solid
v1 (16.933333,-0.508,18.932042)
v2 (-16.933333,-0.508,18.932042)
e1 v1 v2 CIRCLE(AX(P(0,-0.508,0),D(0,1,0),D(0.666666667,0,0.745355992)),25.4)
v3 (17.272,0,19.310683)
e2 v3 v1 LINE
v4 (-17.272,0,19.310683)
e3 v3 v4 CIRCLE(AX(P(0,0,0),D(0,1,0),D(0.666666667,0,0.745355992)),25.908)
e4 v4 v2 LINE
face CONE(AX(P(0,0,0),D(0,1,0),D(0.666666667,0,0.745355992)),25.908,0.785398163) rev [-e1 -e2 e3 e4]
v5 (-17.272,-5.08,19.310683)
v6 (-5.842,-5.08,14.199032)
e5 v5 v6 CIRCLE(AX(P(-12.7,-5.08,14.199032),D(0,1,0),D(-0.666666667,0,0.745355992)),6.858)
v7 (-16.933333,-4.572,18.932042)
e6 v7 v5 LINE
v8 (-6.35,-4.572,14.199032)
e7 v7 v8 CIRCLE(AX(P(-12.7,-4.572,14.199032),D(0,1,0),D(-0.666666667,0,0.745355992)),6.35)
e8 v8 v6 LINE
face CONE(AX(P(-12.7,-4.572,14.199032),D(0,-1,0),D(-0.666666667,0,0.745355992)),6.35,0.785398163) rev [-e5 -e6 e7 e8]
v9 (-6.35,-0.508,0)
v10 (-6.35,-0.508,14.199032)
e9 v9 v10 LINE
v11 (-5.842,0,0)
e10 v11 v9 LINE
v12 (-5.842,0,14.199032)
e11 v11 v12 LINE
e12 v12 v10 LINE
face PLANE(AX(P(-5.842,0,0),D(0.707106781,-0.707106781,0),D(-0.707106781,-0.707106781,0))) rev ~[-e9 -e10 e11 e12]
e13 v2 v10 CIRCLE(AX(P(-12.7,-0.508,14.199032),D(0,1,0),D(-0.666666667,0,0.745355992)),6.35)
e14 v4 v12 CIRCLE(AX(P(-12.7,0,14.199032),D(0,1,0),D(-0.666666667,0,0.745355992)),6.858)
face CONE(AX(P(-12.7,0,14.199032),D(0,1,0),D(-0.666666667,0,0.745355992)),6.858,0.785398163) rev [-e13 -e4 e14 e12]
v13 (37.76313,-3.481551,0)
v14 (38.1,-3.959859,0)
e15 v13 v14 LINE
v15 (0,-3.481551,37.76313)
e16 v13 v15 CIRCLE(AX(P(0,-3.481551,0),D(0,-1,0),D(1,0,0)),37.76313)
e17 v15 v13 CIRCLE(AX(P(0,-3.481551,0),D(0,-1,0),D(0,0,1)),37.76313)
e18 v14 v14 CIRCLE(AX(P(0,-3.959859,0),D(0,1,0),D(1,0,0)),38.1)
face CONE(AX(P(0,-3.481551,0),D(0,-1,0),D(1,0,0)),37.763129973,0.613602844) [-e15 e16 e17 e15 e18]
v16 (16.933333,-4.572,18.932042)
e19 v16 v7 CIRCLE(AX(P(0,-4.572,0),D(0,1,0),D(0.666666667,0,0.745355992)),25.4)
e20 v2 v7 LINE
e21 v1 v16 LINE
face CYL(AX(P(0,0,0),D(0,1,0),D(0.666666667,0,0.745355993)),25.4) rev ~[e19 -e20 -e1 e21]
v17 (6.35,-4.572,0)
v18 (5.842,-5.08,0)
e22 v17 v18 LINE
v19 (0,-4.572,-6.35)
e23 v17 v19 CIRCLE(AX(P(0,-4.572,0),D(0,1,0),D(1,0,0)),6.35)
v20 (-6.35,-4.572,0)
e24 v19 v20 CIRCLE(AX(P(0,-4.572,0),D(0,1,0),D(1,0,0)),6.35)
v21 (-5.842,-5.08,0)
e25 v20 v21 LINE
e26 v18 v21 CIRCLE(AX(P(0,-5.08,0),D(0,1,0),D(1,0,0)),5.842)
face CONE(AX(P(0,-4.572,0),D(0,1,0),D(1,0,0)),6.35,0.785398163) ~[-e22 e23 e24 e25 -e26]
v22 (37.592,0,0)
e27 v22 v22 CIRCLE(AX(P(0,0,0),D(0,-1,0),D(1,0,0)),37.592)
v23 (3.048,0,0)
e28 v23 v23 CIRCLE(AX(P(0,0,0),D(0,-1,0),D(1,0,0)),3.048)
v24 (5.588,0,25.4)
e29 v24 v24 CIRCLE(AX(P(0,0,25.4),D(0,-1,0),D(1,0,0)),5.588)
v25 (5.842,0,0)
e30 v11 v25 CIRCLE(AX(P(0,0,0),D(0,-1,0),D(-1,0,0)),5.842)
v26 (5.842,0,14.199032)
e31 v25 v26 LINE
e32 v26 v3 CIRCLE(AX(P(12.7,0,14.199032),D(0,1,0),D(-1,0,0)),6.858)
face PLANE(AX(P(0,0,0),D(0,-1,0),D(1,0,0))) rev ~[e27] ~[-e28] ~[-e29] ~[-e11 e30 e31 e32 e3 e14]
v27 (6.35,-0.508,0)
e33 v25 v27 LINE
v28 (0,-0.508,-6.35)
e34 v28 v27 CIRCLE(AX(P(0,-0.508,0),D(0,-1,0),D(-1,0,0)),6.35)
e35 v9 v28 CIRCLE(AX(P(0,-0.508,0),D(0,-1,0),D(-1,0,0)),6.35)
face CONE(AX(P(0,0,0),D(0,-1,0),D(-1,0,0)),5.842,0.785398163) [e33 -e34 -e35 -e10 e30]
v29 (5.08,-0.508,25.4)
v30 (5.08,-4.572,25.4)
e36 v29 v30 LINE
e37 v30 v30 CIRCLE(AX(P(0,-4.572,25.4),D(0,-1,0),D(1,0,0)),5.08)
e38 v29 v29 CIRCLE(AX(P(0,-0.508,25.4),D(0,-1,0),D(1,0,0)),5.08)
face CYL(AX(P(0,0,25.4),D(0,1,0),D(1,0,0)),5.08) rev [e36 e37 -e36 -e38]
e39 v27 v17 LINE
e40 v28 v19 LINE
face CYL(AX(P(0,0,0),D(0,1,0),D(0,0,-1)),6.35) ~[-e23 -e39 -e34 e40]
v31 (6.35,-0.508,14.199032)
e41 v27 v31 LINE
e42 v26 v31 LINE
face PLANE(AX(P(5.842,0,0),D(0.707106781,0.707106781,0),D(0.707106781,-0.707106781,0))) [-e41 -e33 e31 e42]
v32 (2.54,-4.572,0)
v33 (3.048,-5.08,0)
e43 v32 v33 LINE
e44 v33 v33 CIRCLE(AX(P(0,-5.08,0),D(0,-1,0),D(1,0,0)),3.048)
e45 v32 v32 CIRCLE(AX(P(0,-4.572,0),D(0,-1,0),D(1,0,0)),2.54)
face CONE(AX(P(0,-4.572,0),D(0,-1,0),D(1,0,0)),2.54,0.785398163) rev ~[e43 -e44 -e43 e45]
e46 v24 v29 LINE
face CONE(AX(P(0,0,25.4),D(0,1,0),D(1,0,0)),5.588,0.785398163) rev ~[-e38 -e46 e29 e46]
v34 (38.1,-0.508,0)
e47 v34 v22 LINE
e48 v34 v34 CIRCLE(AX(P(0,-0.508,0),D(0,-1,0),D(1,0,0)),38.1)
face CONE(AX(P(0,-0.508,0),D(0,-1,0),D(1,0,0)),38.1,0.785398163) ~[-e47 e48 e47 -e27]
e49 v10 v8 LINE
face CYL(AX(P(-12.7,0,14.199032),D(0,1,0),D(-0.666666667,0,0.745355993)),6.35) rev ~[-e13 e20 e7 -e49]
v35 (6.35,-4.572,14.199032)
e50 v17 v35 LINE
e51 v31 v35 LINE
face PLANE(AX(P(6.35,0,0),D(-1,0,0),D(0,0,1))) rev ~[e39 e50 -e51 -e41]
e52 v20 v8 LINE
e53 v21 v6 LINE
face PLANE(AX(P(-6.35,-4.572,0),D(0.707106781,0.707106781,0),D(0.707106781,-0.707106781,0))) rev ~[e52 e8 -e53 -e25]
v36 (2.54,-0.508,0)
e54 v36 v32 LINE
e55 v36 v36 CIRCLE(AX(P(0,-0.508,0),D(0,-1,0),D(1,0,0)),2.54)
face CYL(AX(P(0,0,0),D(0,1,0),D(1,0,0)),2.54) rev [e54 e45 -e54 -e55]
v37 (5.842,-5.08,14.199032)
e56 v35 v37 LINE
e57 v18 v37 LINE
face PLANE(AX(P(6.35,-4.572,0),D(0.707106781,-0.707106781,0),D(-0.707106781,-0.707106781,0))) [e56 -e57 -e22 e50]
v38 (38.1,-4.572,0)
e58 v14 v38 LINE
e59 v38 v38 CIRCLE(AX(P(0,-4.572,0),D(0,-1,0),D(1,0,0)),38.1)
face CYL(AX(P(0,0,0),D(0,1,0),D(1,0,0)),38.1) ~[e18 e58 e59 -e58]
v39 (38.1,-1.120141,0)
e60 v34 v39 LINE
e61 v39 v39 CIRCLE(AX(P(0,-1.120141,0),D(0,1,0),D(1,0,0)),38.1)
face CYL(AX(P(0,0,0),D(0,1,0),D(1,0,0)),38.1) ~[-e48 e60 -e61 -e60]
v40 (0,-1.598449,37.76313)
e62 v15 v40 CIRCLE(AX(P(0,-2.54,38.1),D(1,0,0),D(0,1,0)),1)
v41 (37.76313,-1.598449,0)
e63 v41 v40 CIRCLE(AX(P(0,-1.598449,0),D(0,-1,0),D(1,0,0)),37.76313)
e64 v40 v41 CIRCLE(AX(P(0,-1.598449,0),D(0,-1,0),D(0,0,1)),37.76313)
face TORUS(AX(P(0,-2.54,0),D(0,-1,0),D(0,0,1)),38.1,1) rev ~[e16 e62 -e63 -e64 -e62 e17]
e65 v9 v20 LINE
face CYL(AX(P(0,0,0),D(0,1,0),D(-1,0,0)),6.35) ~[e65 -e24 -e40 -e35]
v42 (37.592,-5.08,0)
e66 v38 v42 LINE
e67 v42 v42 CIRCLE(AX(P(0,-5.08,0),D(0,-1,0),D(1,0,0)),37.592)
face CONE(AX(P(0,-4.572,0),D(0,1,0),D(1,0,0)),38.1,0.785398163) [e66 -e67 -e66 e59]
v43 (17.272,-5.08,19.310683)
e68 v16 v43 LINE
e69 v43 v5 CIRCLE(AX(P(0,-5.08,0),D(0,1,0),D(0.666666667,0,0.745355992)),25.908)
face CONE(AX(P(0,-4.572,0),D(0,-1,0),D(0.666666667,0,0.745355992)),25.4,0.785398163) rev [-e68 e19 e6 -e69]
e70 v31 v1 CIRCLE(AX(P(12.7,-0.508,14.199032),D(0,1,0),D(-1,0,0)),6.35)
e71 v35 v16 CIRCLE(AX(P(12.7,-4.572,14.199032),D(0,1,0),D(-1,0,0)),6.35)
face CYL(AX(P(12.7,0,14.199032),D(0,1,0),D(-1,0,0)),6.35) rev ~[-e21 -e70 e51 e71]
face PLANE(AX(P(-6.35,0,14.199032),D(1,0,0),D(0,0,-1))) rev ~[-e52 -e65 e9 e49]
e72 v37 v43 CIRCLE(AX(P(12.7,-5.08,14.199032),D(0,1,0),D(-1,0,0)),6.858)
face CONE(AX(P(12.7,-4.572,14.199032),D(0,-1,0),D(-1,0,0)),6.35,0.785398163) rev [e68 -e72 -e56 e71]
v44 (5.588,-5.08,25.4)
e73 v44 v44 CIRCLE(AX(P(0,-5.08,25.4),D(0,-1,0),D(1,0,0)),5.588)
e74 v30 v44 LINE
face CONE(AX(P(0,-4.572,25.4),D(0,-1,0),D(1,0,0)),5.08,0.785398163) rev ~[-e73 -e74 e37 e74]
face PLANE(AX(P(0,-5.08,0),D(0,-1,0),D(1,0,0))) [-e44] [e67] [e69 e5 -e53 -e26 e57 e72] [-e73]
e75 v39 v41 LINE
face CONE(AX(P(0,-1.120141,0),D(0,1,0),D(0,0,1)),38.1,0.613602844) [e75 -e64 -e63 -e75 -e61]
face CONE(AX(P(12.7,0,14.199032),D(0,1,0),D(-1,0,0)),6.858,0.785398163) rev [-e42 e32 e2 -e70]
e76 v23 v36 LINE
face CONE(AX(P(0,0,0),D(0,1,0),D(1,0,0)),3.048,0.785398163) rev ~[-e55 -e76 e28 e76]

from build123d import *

# Parameters (mm, degrees)
F0_R         = 38.1
F0_R_2       = 2.54
F0_R_3       = 5.08
F1_DEPTH     = 5.08
F5_T1_DEPTH  = 14.1990316571
F5_T6_ANGLE  = 276.3793702084
F5_T8_ANGLE  = 131.8103148958
F5_T10_ANGLE = 180
F5_T12_ANGLE = 131.8103148958
F5_T20_ANGLE = 276.3793702084
F5_T22_ANGLE = 131.8103148958
F5_T24_ANGLE = 180
F5_T26_ANGLE = 131.8103148958
F5_T32_ANGLE = 270
F5_T34_ANGLE = 90
F5_T36_ANGLE = 90
F5_T38_ANGLE = 270


# Not quite as in the source:
# - a fillet or chamfer that OpenCascade refuses, or shapes differently, is made with other operations: its cross-section is extruded or revolved along the edge and cut away or added


with BuildPart() as f1:
    # F0 (on Front) → F1 (new body)
    with BuildSketch(Plane.XZ):
        Circle(F0_R)
        with BuildLine():
            ThreePointArc((16.9333333333, 18.9320422095), (0, -25.4), (-16.9333333333, 18.9320422095))
            ThreePointArc((-16.9333333333, 18.9320422095), (-10.1076233556, 19.9957620574), (-6.35, 14.1990316571))
            Line((-6.35, 14.1990316571), (-6.35, 0))
            ThreePointArc((-6.35, 0), (-4.4901280605, -4.4901280605), (0, -6.35))
            ThreePointArc((0, -6.35), (4.4901280605, -4.4901280605), (6.35, 0))
            Line((6.35, 0), (6.35, 14.1990316571))
            ThreePointArc((6.35, 14.1990316571), (10.1076233556, 19.9957620574), (16.9333333333, 18.9320422095))
        make_face(mode=Mode.SUBTRACT)
        Circle(F0_R_2, mode=Mode.SUBTRACT)
        with Locations((0, 25.4)):
            Circle(F0_R_3, mode=Mode.SUBTRACT)
    extrude(amount=F1_DEPTH)


with BuildPart() as f3:
    # F2 (on Right) → F3 (revolve)
    with BuildSketch(Plane.YZ):
        with BuildLine():
            ThreePointArc((-3.54, 38.1), (-2.54, 37.1), (-1.54, 38.1))
            Line((-1.54, 38.1), (-3.54, 38.1))
        make_face()
        with BuildLine():
            Line((-3.54, 38.1), (-1.54, 38.1))
            ThreePointArc((-1.54, 38.1), (-2.54, 39.1), (-3.54, 38.1))
        make_face()
    revolve(axis=Axis((0, 0, 0), (0, -1, 0)))


with BuildPart() as f1_1:
    add(f1.part)

    # F4: cut F3
    add(f3.part, mode=Mode.SUBTRACT)

    # F5: chamfer of 0.508 on 22 edges, made by hand

    # F5_s2 → F5_t1 (cut)
    with BuildSketch(Plane.XY):
        Polygon((-6.35, -4.572), (-5.842, -5.08), (-6.35, -5.08), align=None)
        Polygon((6.35, -4.572), (5.842, -5.08), (6.35, -5.08), align=None)
        Polygon((-5.842, 0), (-6.35, -0.508), (-6.35, 0), align=None)
        Polygon((5.842, 0), (6.35, -0.508), (6.35, 0), align=None)
    extrude(amount=F5_T1_DEPTH, mode=Mode.SUBTRACT)

    # F5_s3 → F5_t4 (revolve, cut)
    with BuildSketch(Plane.XY):
        Polygon((38.1, -4.572), (37.592, -5.08), (38.1, -5.08), align=None)
    revolve(axis=Axis((0, -5.08, 0), (0, -1, 0)), mode=Mode.SUBTRACT)

    # F5_s5 → F5_t6 (revolve, cut)
    with BuildSketch(Plane(origin=(0, 0, 0), x_dir=(0, 1, 0), z_dir=(-0.7453559925, 0, 0.6666666667))):
        Polygon((-4.572, -25.4), (-5.08, -25.908), (-5.08, -25.4), align=None)
    revolve(axis=Axis((0, -5.08, 0), (0, 1, 0)), revolution_arc=F5_T6_ANGLE, mode=Mode.SUBTRACT)

    # F5_s7 → F5_t8 (revolve, cut)
    with BuildSketch(Plane(origin=(0, 0, 0), x_dir=(0, 1, 0), z_dir=(-0.7453559925, 0, -0.6666666667))):
        Polygon((-4.572, -25.4), (-5.08, -25.908), (-5.08, -25.4), align=None)
    revolve(axis=Axis((-12.7, -5.08, 14.1990316571), (0, 1, 0)), revolution_arc=F5_T8_ANGLE, mode=Mode.SUBTRACT)

    # F5_s9 → F5_t10 (revolve, cut)
    with BuildSketch(Plane.XY):
        Polygon((6.35, -4.572), (5.842, -5.08), (6.35, -5.08), align=None)
    revolve(axis=Axis((0, -5.08, 0), (0, 1, 0)), revolution_arc=F5_T10_ANGLE, mode=Mode.SUBTRACT)

    # F5_s11 → F5_t12 (revolve, cut)
    with BuildSketch(Plane.XY.offset(14.1990316571)):
        Polygon((6.35, -4.572), (5.842, -5.08), (6.35, -5.08), align=None)
    revolve(axis=Axis((12.7, -5.08, 14.1990316571), (0, 1, 0)), revolution_arc=F5_T12_ANGLE, mode=Mode.SUBTRACT)

    # F5_s13 → F5_t14 (revolve, cut)
    with BuildSketch(Plane.XY):
        Polygon((2.54, -4.572), (3.048, -5.08), (2.54, -5.08), align=None)
    revolve(axis=Axis((0, -5.08, 0), (0, -1, 0)), mode=Mode.SUBTRACT)

    # F5_s15 → F5_t16 (revolve, cut)
    with BuildSketch(Plane.XY.offset(25.4)):
        Polygon((5.08, -4.572), (5.588, -5.08), (5.08, -5.08), align=None)
    revolve(axis=Axis((0, -5.08, 25.4), (0, -1, 0)), mode=Mode.SUBTRACT)

    # F5_s17 → F5_t18 (revolve, cut)
    with BuildSketch(Plane.XY):
        Polygon((38.1, -0.508), (37.592, 0), (38.1, 0), align=None)
    revolve(axis=Axis((0, 0, 0), (0, -1, 0)), mode=Mode.SUBTRACT)

    # F5_s19 → F5_t20 (revolve, cut)
    with BuildSketch(Plane(origin=(0, 0, 0), x_dir=(0, 1, 0), z_dir=(-0.7453559925, 0, 0.6666666667))):
        Polygon((0, -25.908), (-0.508, -25.4), (0, -25.4), align=None)
    revolve(axis=Axis((0, 0, 0), (0, 1, 0)), revolution_arc=F5_T20_ANGLE, mode=Mode.SUBTRACT)

    # F5_s21 → F5_t22 (revolve, cut)
    with BuildSketch(Plane(origin=(0, 0, 0), x_dir=(0, 1, 0), z_dir=(-0.7453559925, 0, -0.6666666667))):
        Polygon((0, -25.908), (-0.508, -25.4), (0, -25.4), align=None)
    revolve(axis=Axis((-12.7, 0, 14.1990316571), (0, 1, 0)), revolution_arc=F5_T22_ANGLE, mode=Mode.SUBTRACT)

    # F5_s23 → F5_t24 (revolve, cut)
    with BuildSketch(Plane.XY):
        Polygon((-5.842, 0), (-6.35, -0.508), (-6.35, 0), align=None)
    revolve(axis=Axis((0, 0, 0), (0, -1, 0)), revolution_arc=F5_T24_ANGLE, mode=Mode.SUBTRACT)

    # F5_s25 → F5_t26 (revolve, cut)
    with BuildSketch(Plane.XY.offset(14.1990316571)):
        Polygon((5.842, 0), (6.35, -0.508), (6.35, 0), align=None)
    revolve(axis=Axis((12.7, 0, 14.1990316571), (0, 1, 0)), revolution_arc=F5_T26_ANGLE, mode=Mode.SUBTRACT)

    # F5_s27 → F5_t28 (revolve, cut)
    with BuildSketch(Plane.XY):
        Polygon((3.048, 0), (2.54, -0.508), (2.54, 0), align=None)
    revolve(axis=Axis((0, 0, 0), (0, -1, 0)), mode=Mode.SUBTRACT)

    # F5_s29 → F5_t30 (revolve, cut)
    with BuildSketch(Plane.XY.offset(25.4)):
        Polygon((5.588, 0), (5.08, -0.508), (5.08, 0), align=None)
    revolve(axis=Axis((0, 0, 25.4), (0, -1, 0)), mode=Mode.SUBTRACT)

    # F5_s31 → F5_t32 (revolve, cut)
    with BuildSketch(Plane.YZ):
        with BuildLine():
            Line((-1.1201408521, 38.1), (-1.5984488409, 37.7631299735))
            ThreePointArc((-1.5984488409, 37.7631299735), (-1.5560027564, 37.921816318), (-1.54, 38.1))
            Line((-1.54, 38.1), (-1.1201408521, 38.1))
        make_face()
    revolve(axis=Axis((0, -1.54, 0), (0, -1, 0)), revolution_arc=F5_T32_ANGLE, mode=Mode.SUBTRACT)

    # F5_s33 → F5_t34 (revolve, cut)
    with BuildSketch(Plane.XY):
        with BuildLine():
            Line((38.1, -1.1201408521), (37.7631299735, -1.5984488409))
            ThreePointArc((37.7631299735, -1.5984488409), (37.921816318, -1.5560027564), (38.1, -1.54))
            Line((38.1, -1.54), (38.1, -1.1201408521))
        make_face()
    revolve(axis=Axis((0, -1.54, 0), (0, -1, 0)), revolution_arc=F5_T34_ANGLE, mode=Mode.SUBTRACT)

    # F5_s35 → F5_t36 (revolve, cut)
    with BuildSketch(Plane.XY):
        with BuildLine():
            Line((37.7631299735, -3.4815511591), (38.1, -3.9598591479))
            Line((38.1, -3.9598591479), (38.1, -3.54))
            ThreePointArc((38.1, -3.54), (37.921816318, -3.5239972436), (37.7631299735, -3.4815511591))
        make_face()
    revolve(axis=Axis((0, -3.54, 0), (0, -1, 0)), revolution_arc=F5_T36_ANGLE, mode=Mode.SUBTRACT)

    # F5_s37 → F5_t38 (revolve, cut)
    with BuildSketch(Plane.YZ):
        with BuildLine():
            Line((-3.4815511591, 37.7631299735), (-3.9598591479, 38.1))
            Line((-3.9598591479, 38.1), (-3.54, 38.1))
            ThreePointArc((-3.54, 38.1), (-3.5239972436, 37.921816318), (-3.4815511591, 37.7631299735))
        make_face()
    revolve(axis=Axis((0, -3.54, 0), (0, -1, 0)), revolution_arc=F5_T38_ANGLE, mode=Mode.SUBTRACT)


solid = f1_1.part
